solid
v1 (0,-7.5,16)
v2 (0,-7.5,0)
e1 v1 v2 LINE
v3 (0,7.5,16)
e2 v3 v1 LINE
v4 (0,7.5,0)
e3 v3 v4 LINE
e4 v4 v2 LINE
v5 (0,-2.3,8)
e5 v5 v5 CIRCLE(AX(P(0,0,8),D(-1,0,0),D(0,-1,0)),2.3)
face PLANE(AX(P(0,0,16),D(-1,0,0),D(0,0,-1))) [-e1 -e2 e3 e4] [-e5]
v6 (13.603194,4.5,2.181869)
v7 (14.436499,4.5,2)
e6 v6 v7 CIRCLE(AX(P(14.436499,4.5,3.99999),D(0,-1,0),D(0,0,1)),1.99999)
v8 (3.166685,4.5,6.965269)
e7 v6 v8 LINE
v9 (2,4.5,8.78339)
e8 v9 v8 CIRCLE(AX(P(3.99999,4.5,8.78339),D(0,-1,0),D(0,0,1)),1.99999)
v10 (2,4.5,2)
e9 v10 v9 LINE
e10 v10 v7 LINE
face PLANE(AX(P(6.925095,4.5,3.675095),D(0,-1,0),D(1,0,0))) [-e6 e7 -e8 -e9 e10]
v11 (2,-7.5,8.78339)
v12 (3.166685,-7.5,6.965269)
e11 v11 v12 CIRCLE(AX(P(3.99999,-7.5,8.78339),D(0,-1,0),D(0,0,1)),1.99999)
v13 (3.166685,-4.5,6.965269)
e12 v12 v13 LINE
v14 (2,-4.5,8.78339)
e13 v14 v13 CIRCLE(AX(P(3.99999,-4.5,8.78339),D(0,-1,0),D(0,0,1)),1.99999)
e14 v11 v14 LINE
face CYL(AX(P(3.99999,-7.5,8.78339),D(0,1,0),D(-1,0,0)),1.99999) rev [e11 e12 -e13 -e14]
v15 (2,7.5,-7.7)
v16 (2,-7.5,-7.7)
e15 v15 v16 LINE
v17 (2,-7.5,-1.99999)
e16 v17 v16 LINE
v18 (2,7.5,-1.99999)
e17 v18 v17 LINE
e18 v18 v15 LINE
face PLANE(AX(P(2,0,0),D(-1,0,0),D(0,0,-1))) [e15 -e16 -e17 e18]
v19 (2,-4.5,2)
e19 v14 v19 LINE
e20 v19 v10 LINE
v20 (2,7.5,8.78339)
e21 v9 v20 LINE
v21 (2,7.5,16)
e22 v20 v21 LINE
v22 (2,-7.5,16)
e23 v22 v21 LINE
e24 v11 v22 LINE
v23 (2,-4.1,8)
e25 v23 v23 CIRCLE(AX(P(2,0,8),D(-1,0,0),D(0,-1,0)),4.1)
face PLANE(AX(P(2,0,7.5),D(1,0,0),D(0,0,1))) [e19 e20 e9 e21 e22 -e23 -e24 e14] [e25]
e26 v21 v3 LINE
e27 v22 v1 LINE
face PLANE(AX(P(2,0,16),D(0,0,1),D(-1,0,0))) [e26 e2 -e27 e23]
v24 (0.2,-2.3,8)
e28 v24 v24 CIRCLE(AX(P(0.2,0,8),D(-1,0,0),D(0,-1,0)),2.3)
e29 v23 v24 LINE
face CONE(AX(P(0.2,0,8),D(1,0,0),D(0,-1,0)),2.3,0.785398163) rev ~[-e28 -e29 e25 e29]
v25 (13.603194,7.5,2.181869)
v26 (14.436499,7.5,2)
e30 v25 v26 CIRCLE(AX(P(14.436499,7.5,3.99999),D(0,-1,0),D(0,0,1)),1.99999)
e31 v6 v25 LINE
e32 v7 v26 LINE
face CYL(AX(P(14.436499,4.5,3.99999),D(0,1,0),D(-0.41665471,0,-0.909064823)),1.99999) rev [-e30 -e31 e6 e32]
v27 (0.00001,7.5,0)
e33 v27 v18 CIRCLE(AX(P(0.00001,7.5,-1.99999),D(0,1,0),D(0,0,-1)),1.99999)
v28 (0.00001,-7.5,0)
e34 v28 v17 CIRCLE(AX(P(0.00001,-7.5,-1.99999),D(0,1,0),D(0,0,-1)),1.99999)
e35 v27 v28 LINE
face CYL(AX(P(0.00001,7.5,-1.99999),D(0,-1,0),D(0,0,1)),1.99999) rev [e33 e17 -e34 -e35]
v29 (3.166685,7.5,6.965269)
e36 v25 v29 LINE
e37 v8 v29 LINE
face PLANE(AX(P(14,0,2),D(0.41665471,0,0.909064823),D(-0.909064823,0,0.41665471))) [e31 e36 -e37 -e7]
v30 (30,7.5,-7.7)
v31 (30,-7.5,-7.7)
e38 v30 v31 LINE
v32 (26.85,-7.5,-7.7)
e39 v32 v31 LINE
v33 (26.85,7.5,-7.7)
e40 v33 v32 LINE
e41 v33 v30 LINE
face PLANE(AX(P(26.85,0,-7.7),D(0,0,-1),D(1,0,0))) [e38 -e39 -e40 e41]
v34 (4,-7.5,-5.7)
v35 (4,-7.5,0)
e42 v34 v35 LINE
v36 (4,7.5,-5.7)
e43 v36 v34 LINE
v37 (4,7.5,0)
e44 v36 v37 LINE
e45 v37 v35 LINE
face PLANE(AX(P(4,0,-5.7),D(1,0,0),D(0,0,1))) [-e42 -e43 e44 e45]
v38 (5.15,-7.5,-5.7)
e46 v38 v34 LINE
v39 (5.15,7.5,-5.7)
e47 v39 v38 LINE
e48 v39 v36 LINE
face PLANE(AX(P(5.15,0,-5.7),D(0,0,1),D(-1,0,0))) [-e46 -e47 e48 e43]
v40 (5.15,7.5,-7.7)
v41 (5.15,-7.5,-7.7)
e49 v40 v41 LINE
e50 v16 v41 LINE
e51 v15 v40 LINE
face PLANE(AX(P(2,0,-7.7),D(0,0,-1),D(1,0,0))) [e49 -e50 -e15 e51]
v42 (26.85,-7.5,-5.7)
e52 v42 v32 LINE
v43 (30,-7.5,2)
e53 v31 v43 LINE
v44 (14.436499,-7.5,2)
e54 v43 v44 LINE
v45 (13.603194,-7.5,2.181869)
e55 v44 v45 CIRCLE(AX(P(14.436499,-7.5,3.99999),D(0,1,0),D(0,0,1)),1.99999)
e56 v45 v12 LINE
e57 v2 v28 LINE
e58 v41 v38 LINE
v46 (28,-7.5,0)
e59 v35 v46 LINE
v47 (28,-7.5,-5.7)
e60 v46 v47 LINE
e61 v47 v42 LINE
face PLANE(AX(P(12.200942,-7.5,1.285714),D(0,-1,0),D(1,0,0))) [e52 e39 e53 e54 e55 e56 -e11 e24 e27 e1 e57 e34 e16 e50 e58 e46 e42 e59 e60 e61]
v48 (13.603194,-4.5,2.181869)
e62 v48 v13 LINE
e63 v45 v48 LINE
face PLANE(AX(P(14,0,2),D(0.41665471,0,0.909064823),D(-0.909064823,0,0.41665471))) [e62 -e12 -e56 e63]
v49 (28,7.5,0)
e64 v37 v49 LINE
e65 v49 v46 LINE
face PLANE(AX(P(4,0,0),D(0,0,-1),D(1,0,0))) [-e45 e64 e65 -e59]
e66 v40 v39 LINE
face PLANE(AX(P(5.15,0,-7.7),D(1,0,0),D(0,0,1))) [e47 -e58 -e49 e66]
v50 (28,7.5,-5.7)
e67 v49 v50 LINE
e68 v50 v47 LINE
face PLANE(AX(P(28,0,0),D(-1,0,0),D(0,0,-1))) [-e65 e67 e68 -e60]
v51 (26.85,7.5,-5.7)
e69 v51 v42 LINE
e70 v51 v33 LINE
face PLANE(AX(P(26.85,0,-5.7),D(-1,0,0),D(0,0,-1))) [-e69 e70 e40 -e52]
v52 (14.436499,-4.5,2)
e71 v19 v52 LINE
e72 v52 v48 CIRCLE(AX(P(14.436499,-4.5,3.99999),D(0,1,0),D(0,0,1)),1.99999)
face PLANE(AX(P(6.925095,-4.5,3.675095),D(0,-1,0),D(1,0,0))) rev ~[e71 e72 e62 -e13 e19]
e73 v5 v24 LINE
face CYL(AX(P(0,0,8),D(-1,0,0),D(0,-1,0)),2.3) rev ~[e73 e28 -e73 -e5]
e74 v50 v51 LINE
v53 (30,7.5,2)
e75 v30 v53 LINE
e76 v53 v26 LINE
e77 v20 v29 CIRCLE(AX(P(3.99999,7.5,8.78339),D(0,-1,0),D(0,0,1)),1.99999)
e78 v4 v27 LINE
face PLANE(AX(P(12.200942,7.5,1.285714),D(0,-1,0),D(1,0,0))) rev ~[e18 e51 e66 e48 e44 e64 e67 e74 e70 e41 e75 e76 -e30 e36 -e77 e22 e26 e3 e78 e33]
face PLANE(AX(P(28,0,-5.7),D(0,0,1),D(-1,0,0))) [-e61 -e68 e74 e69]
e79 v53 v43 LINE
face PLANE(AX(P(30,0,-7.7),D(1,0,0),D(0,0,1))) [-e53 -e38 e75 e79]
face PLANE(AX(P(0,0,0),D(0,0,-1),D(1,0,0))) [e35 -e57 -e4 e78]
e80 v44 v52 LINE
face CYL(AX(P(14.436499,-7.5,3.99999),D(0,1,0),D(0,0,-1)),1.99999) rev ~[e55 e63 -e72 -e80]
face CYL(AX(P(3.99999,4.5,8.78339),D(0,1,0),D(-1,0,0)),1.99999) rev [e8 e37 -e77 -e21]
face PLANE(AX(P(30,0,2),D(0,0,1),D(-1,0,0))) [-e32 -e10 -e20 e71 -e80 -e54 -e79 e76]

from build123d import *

# Parameters (mm, degrees)
F1_DEPTH = 7.5
F2_DEPTH = 4.5
F3_R     = 2.3
F4_DEPTH = 5
F5_SIZE  = 1.8
F6_R     = 1.99999


# Not quite as in the source:
# - a fillet or chamfer is up to 0.001 mm smaller than in the source, because OpenCascade refuses the exact size


with BuildPart() as f1:
    # F0 (on Front) → F1 (new body, symmetric)
    with BuildSketch(Plane.XZ):
        Polygon((2, 16), (0, 16), (0, 0), (2, 0), (2, -7.7), (5.15, -7.7), (5.15, -5.7), (4, -5.7), (4, 0), (28, 0), (28, -5.7), (26.85, -5.7), (26.85, -7.7), (30, -7.7), (30, 2), (14, 2), (2, 2), (2, 7.5), align=None)
        Polygon((14, 2), (2, 7.5), (2, 2), align=None)
    extrude(amount=F1_DEPTH, both=True)

    # F0 (on Front) → F2 (cut, symmetric)
    with BuildSketch(Plane.XZ):
        Polygon((14, 2), (2, 7.5), (2, 2), align=None)
    extrude(amount=F2_DEPTH, both=True, mode=Mode.SUBTRACT)

    # F3 (on face) → F4 (cut)
    with BuildSketch(Plane(origin=(0, 0, 0), x_dir=(0, -1, 0), z_dir=(-1, 0, 0))):
        with Locations((0, 8)):
            Circle(F3_R)
    extrude(amount=-F4_DEPTH, mode=Mode.SUBTRACT)

    # F5
    f5_edges = [f1.edges().sort_by_distance(p)[0] for p in [
        (2, 2.3, 8),
    ]]
    chamfer(f5_edges, length=F5_SIZE)

    # F6 (radius 2 in the source; OpenCascade refuses exactly that, so slightly less here)
    f6_edges = [f1.edges().sort_by_distance(p)[0] for p in [
        (2, -6, 7.5),
        (14, 6, 2),
        (14, -6, 2),
        (2, 6, 7.5),
        (2, 0, 0),
    ]]
    fillet(f6_edges, radius=F6_R)


solid = f1.part
